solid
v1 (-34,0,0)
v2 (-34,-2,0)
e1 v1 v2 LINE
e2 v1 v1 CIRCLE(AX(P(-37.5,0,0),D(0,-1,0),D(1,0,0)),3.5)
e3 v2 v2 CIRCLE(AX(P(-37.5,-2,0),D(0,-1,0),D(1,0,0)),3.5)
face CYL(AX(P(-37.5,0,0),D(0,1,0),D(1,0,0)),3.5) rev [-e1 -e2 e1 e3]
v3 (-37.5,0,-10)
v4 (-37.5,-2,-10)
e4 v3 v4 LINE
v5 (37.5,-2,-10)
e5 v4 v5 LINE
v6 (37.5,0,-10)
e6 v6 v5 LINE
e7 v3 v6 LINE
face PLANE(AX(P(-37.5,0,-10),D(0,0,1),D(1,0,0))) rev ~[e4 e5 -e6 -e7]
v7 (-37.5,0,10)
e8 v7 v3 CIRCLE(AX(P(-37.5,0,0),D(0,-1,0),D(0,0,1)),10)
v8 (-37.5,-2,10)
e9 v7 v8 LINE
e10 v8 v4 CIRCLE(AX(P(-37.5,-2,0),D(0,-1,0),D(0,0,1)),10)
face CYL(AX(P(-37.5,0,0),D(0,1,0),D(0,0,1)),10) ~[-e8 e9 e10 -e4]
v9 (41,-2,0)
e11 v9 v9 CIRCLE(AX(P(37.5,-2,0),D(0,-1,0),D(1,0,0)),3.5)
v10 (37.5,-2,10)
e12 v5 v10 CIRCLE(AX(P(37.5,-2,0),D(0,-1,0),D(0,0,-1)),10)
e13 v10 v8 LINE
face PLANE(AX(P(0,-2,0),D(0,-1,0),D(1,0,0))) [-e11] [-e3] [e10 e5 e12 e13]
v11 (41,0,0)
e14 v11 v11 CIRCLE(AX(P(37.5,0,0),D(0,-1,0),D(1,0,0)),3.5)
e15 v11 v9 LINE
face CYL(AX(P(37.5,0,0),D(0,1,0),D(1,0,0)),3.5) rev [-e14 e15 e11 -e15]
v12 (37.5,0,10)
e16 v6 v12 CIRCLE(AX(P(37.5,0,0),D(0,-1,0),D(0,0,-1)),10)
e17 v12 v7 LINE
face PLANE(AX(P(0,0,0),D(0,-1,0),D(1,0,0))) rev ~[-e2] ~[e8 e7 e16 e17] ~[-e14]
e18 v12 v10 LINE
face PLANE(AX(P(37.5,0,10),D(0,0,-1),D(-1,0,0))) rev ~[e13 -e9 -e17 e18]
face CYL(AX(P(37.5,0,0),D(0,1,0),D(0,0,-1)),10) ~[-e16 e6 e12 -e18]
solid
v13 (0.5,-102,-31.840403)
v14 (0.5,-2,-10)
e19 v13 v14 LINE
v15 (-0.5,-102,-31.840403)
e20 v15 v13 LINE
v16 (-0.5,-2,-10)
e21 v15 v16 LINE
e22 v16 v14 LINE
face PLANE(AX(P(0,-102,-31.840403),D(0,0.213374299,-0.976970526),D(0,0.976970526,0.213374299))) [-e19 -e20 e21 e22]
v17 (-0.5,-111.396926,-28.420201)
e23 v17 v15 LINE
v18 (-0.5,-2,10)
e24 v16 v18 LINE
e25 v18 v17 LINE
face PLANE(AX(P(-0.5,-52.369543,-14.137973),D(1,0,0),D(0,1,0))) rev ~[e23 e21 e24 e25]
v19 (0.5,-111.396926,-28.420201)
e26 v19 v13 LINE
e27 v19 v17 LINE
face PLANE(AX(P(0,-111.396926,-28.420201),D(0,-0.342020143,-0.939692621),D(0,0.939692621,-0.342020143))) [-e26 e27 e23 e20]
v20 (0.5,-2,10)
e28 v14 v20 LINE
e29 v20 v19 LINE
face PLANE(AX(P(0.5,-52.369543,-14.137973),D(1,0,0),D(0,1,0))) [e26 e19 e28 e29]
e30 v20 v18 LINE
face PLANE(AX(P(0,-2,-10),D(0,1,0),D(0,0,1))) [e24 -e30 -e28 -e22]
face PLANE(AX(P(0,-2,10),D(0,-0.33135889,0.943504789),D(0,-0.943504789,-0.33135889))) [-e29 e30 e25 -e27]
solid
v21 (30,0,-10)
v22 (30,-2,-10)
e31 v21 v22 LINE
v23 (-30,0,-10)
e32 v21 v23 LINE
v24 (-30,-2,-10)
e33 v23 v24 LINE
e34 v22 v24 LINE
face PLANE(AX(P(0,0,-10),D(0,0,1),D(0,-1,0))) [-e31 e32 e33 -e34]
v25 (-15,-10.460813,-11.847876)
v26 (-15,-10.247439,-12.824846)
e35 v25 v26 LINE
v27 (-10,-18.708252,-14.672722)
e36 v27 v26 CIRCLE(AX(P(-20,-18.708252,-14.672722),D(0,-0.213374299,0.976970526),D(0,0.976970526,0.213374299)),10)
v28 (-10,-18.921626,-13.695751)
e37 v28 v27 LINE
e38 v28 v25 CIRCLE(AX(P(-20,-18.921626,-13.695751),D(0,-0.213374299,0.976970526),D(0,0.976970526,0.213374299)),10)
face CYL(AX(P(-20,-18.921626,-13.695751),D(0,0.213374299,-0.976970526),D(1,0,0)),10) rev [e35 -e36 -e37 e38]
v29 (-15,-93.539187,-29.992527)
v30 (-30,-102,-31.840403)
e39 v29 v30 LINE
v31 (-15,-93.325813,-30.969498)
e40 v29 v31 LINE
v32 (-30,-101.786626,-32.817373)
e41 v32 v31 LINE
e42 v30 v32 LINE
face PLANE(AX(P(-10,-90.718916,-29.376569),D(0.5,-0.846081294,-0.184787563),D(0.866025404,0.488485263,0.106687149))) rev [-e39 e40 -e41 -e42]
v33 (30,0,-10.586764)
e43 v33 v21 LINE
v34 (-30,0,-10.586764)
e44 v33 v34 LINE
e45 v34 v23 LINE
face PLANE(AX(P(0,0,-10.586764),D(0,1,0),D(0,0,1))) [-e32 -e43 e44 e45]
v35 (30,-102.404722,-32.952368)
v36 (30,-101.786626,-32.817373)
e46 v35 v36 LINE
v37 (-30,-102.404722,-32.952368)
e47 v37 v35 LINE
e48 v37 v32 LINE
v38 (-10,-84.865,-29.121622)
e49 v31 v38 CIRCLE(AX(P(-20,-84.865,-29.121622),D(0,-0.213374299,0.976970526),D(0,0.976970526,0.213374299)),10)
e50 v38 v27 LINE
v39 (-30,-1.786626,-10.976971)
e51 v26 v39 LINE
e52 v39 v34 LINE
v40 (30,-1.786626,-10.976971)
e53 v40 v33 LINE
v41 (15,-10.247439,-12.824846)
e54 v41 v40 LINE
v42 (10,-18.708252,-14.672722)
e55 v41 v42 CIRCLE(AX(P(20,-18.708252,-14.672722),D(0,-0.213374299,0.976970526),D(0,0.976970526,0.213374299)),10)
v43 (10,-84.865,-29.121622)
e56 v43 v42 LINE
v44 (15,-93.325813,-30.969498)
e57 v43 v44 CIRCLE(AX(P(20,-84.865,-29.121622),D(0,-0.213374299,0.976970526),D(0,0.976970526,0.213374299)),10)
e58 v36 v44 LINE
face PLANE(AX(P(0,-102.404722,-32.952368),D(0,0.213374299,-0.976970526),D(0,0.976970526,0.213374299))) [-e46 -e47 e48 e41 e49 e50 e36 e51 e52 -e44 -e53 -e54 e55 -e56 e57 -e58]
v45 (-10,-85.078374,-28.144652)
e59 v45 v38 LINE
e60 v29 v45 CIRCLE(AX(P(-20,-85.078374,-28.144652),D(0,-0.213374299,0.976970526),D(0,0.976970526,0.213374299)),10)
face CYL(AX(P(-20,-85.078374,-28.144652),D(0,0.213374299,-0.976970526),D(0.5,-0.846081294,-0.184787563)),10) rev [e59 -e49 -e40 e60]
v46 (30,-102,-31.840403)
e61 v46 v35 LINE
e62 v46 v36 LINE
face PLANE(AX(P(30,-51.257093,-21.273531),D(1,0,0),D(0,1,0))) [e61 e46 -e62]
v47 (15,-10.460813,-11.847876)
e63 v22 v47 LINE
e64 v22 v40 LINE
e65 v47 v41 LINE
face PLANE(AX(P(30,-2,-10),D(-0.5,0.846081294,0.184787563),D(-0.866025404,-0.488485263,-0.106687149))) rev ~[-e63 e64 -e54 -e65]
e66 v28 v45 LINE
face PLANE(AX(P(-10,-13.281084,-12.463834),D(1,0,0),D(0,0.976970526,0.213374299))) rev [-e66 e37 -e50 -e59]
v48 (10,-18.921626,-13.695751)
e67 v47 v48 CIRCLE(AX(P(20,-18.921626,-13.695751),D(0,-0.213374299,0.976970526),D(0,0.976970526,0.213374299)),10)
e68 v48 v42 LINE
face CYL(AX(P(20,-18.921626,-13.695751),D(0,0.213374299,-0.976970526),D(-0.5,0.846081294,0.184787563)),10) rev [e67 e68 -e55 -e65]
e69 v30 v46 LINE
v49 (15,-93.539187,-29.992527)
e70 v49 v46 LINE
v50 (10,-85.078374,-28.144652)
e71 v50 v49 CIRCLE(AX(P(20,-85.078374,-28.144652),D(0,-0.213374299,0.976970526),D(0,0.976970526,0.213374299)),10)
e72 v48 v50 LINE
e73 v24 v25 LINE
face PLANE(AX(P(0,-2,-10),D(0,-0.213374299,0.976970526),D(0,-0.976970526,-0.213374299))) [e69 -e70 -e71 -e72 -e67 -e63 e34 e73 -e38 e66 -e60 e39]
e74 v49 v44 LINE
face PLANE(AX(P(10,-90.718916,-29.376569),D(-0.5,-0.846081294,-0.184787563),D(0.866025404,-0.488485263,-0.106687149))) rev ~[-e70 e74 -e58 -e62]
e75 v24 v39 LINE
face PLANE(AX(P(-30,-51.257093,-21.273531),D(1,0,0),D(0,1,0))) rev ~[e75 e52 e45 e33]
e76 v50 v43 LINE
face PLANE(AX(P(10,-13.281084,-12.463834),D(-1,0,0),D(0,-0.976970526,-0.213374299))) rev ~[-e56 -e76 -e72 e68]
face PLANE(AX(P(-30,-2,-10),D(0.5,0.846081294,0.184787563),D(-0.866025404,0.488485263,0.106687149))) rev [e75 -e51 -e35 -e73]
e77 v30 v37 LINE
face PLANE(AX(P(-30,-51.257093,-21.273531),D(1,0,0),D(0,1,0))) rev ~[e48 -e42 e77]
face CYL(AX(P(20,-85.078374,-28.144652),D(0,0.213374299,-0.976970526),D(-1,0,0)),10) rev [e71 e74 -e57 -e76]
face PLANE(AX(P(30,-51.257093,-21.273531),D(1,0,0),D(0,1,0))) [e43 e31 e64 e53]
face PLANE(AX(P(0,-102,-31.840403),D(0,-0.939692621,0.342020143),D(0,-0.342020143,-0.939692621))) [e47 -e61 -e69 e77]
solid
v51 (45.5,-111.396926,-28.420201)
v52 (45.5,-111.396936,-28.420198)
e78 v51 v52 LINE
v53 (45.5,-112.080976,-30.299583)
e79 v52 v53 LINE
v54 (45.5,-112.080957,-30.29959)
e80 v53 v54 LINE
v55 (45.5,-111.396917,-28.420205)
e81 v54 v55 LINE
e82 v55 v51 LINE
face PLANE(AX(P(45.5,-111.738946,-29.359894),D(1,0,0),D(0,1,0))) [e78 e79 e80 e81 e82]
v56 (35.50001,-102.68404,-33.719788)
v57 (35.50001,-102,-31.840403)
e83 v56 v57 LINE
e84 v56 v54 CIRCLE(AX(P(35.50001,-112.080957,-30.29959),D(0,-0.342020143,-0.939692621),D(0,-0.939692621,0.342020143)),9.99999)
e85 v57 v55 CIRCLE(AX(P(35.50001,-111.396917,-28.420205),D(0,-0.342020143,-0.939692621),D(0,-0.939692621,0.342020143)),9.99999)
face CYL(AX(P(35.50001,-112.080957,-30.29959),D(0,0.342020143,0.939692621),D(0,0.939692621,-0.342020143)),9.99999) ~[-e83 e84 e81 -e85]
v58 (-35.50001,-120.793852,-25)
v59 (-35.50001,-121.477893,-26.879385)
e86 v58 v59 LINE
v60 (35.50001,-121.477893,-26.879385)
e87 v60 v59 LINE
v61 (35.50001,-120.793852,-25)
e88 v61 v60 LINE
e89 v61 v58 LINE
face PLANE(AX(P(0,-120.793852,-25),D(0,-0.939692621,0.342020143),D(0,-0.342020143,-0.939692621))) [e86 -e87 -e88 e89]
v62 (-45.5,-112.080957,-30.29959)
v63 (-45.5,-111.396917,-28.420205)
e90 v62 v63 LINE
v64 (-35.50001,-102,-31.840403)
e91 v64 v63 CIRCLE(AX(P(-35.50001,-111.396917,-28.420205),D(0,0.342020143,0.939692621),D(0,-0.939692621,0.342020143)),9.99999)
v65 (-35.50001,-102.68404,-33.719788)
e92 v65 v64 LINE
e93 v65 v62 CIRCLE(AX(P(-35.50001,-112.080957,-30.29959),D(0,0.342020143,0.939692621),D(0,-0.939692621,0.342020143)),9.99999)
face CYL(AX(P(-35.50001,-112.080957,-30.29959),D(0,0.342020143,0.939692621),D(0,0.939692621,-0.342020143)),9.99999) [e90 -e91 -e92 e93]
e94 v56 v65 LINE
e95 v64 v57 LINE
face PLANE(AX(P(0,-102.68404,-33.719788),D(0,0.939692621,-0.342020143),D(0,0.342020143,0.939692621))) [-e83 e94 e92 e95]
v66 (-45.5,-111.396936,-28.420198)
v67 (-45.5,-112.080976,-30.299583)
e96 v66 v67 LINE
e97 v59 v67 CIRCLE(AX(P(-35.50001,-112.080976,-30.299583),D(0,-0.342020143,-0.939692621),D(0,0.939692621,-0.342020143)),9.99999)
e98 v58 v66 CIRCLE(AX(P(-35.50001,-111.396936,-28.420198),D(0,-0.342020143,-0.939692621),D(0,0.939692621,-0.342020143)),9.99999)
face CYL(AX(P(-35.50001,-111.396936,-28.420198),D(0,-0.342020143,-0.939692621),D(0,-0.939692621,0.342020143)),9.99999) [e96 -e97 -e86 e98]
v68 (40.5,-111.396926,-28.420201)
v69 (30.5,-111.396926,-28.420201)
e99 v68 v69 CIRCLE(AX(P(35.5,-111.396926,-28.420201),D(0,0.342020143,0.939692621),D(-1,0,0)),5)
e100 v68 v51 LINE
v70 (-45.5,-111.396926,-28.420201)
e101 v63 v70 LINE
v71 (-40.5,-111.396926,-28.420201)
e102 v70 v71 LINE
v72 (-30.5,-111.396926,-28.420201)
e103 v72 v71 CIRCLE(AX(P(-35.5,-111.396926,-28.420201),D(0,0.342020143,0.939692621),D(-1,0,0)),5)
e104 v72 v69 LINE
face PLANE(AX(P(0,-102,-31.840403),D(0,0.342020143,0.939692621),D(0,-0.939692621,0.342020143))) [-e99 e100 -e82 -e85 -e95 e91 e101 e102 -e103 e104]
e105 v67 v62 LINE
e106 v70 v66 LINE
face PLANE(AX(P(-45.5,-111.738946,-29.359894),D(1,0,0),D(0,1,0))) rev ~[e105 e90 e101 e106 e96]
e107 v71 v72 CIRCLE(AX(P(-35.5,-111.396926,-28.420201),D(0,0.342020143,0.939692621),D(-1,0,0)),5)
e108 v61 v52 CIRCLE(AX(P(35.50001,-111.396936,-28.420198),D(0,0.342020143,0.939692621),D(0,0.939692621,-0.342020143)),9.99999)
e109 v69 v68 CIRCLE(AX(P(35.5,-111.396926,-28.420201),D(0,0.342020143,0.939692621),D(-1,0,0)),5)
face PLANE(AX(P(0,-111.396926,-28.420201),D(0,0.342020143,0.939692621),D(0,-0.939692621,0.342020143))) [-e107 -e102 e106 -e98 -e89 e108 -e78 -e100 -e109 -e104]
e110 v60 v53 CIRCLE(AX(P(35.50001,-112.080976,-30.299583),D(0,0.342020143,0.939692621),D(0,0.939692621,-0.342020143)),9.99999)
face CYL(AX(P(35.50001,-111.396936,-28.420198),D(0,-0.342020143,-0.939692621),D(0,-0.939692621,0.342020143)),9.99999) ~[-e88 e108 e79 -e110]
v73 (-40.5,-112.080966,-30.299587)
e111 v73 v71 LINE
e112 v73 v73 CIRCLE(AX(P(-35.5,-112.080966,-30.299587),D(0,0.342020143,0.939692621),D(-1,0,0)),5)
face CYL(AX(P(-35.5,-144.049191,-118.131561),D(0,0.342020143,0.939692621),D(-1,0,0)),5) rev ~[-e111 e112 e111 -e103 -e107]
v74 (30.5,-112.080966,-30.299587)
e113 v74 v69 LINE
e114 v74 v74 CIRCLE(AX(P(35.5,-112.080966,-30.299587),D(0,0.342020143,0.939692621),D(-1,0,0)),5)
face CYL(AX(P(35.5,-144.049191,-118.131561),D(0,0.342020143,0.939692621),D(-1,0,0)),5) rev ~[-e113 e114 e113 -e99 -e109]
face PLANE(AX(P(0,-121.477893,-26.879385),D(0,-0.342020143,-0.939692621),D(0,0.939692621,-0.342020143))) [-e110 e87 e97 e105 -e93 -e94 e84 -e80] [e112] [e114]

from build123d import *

# Parameters (mm, degrees)
F0_R      = 3.5
F1_DEPTH  = 2
F3_DEPTH  = 0.5
F4_DEPTH  = 45.5
F5_R      = 9.99999
F7_D      = 10
F9_DEPTH  = 30
F11_DEPTH = 23.6012824615
F12_R     = 10


# Not quite as in the source:
# - a fillet or chamfer is up to 0.001 mm smaller than in the source, because OpenCascade refuses the exact size
# - a pattern or mirror of a feature is missing from the dataset's text; its kind, count and spacing are read off the source's solid


with BuildPart() as f1:
    # F0 (on Front) → F1 (new body)
    with BuildSketch(Plane.XZ):
        with BuildLine():
            Line((37.5, 10), (-37.5, 10))
            ThreePointArc((-37.5, 10), (-47.5, 0), (-37.5, -10))
            Line((-37.5, -10), (37.5, -10))
            ThreePointArc((37.5, -10), (47.5, 0), (37.5, 10))
        make_face()
        with Locations((-37.5, 0)):
            Circle(F0_R, mode=Mode.SUBTRACT)
        with Locations((37.5, 0)):
            Circle(F0_R, mode=Mode.SUBTRACT)
    extrude(amount=F1_DEPTH)


with BuildPart() as f3:
    # F2 (on Right) → F3 (new body, symmetric)
    with BuildSketch(Plane.YZ):
        Polygon((-111.3969262079, -28.4202014333), (-102, -31.8404028665), (-2, -10), (-2, 10), align=None)
    extrude(amount=F3_DEPTH, both=True)


with BuildPart() as f4:
    # F2 (on Right) → F4 (new body, symmetric)
    with BuildSketch(Plane.YZ):
        Polygon((-102.6840402867, -33.7197881081), (-102, -31.8404028665), (-111.3969262079, -28.4202014333), (-120.7938524157, -25), (-121.4778927024, -26.8793852416), align=None)
    extrude(amount=F4_DEPTH, both=True)

    # F5 (radius 10 in the source; OpenCascade refuses exactly that, so slightly less here)
    f5_edges = [f4.edges().sort_by_distance(p)[0] for p in [
        (45.5, -121.135873, -25.939693),
        (45.5, -102.34202, -32.780095),
        (-45.5, -121.135873, -25.939693),
        (-45.5, -102.34202, -32.780095),
    ]]
    fillet(f5_edges, radius=F5_R)

    # F7 (through all)
    with Locations(Plane(origin=(0, -22.8490819126, -62.7773366101), x_dir=(1, 0, 0), z_dir=(0, -0.3420201433, -0.9396926208))):
        with Locations((35.5, 94.9585881682), (-35.5, 94.9585881682)):
            Hole(F7_D / 2)


with BuildPart() as f9:
    # F8 (on Right) → F9 (new body, symmetric)
    with BuildSketch(Plane.YZ):
        Polygon((-2, -10), (-102, -31.8404028665), (-102.4047222734, -32.952368174), (0, -10.5867642751), (0, -10), align=None)
    extrude(amount=F9_DEPTH, both=True)

    # F10 (on face) → F11 (cut, through all)
    with BuildSketch(Plane(origin=(0, 1.9935468262, -9.1277932845), x_dir=(1, 0, 0), z_dir=(0, -0.2133742988, 0.976970526))):
        Polygon((30, -106.4449172836), (30, -4.0876840396), (10, -15.6346894234), (10, -94.8979118998), align=None)
    f11 = extrude(amount=-F11_DEPTH, mode=Mode.SUBTRACT)

    # F11_copies: F11 across plane
    add(f11.mirror(Plane(origin=(0, 0, 0), x_dir=(0, 0, -1), z_dir=(-1, 0, 0))), mode=Mode.SUBTRACT)

    # F12
    f12_edges = [f9.edges().sort_by_distance(p)[0] for p in [
        (10, -90.612229, -29.865054),
        (10, -13.174397, -12.952319),
        (-10, -13.174397, -12.952319),
        (-10, -90.612229, -29.865054),
    ]]
    fillet(f12_edges, radius=F12_R)


solid = Compound([f1.part, f3.part, f4.part, f9.part])
